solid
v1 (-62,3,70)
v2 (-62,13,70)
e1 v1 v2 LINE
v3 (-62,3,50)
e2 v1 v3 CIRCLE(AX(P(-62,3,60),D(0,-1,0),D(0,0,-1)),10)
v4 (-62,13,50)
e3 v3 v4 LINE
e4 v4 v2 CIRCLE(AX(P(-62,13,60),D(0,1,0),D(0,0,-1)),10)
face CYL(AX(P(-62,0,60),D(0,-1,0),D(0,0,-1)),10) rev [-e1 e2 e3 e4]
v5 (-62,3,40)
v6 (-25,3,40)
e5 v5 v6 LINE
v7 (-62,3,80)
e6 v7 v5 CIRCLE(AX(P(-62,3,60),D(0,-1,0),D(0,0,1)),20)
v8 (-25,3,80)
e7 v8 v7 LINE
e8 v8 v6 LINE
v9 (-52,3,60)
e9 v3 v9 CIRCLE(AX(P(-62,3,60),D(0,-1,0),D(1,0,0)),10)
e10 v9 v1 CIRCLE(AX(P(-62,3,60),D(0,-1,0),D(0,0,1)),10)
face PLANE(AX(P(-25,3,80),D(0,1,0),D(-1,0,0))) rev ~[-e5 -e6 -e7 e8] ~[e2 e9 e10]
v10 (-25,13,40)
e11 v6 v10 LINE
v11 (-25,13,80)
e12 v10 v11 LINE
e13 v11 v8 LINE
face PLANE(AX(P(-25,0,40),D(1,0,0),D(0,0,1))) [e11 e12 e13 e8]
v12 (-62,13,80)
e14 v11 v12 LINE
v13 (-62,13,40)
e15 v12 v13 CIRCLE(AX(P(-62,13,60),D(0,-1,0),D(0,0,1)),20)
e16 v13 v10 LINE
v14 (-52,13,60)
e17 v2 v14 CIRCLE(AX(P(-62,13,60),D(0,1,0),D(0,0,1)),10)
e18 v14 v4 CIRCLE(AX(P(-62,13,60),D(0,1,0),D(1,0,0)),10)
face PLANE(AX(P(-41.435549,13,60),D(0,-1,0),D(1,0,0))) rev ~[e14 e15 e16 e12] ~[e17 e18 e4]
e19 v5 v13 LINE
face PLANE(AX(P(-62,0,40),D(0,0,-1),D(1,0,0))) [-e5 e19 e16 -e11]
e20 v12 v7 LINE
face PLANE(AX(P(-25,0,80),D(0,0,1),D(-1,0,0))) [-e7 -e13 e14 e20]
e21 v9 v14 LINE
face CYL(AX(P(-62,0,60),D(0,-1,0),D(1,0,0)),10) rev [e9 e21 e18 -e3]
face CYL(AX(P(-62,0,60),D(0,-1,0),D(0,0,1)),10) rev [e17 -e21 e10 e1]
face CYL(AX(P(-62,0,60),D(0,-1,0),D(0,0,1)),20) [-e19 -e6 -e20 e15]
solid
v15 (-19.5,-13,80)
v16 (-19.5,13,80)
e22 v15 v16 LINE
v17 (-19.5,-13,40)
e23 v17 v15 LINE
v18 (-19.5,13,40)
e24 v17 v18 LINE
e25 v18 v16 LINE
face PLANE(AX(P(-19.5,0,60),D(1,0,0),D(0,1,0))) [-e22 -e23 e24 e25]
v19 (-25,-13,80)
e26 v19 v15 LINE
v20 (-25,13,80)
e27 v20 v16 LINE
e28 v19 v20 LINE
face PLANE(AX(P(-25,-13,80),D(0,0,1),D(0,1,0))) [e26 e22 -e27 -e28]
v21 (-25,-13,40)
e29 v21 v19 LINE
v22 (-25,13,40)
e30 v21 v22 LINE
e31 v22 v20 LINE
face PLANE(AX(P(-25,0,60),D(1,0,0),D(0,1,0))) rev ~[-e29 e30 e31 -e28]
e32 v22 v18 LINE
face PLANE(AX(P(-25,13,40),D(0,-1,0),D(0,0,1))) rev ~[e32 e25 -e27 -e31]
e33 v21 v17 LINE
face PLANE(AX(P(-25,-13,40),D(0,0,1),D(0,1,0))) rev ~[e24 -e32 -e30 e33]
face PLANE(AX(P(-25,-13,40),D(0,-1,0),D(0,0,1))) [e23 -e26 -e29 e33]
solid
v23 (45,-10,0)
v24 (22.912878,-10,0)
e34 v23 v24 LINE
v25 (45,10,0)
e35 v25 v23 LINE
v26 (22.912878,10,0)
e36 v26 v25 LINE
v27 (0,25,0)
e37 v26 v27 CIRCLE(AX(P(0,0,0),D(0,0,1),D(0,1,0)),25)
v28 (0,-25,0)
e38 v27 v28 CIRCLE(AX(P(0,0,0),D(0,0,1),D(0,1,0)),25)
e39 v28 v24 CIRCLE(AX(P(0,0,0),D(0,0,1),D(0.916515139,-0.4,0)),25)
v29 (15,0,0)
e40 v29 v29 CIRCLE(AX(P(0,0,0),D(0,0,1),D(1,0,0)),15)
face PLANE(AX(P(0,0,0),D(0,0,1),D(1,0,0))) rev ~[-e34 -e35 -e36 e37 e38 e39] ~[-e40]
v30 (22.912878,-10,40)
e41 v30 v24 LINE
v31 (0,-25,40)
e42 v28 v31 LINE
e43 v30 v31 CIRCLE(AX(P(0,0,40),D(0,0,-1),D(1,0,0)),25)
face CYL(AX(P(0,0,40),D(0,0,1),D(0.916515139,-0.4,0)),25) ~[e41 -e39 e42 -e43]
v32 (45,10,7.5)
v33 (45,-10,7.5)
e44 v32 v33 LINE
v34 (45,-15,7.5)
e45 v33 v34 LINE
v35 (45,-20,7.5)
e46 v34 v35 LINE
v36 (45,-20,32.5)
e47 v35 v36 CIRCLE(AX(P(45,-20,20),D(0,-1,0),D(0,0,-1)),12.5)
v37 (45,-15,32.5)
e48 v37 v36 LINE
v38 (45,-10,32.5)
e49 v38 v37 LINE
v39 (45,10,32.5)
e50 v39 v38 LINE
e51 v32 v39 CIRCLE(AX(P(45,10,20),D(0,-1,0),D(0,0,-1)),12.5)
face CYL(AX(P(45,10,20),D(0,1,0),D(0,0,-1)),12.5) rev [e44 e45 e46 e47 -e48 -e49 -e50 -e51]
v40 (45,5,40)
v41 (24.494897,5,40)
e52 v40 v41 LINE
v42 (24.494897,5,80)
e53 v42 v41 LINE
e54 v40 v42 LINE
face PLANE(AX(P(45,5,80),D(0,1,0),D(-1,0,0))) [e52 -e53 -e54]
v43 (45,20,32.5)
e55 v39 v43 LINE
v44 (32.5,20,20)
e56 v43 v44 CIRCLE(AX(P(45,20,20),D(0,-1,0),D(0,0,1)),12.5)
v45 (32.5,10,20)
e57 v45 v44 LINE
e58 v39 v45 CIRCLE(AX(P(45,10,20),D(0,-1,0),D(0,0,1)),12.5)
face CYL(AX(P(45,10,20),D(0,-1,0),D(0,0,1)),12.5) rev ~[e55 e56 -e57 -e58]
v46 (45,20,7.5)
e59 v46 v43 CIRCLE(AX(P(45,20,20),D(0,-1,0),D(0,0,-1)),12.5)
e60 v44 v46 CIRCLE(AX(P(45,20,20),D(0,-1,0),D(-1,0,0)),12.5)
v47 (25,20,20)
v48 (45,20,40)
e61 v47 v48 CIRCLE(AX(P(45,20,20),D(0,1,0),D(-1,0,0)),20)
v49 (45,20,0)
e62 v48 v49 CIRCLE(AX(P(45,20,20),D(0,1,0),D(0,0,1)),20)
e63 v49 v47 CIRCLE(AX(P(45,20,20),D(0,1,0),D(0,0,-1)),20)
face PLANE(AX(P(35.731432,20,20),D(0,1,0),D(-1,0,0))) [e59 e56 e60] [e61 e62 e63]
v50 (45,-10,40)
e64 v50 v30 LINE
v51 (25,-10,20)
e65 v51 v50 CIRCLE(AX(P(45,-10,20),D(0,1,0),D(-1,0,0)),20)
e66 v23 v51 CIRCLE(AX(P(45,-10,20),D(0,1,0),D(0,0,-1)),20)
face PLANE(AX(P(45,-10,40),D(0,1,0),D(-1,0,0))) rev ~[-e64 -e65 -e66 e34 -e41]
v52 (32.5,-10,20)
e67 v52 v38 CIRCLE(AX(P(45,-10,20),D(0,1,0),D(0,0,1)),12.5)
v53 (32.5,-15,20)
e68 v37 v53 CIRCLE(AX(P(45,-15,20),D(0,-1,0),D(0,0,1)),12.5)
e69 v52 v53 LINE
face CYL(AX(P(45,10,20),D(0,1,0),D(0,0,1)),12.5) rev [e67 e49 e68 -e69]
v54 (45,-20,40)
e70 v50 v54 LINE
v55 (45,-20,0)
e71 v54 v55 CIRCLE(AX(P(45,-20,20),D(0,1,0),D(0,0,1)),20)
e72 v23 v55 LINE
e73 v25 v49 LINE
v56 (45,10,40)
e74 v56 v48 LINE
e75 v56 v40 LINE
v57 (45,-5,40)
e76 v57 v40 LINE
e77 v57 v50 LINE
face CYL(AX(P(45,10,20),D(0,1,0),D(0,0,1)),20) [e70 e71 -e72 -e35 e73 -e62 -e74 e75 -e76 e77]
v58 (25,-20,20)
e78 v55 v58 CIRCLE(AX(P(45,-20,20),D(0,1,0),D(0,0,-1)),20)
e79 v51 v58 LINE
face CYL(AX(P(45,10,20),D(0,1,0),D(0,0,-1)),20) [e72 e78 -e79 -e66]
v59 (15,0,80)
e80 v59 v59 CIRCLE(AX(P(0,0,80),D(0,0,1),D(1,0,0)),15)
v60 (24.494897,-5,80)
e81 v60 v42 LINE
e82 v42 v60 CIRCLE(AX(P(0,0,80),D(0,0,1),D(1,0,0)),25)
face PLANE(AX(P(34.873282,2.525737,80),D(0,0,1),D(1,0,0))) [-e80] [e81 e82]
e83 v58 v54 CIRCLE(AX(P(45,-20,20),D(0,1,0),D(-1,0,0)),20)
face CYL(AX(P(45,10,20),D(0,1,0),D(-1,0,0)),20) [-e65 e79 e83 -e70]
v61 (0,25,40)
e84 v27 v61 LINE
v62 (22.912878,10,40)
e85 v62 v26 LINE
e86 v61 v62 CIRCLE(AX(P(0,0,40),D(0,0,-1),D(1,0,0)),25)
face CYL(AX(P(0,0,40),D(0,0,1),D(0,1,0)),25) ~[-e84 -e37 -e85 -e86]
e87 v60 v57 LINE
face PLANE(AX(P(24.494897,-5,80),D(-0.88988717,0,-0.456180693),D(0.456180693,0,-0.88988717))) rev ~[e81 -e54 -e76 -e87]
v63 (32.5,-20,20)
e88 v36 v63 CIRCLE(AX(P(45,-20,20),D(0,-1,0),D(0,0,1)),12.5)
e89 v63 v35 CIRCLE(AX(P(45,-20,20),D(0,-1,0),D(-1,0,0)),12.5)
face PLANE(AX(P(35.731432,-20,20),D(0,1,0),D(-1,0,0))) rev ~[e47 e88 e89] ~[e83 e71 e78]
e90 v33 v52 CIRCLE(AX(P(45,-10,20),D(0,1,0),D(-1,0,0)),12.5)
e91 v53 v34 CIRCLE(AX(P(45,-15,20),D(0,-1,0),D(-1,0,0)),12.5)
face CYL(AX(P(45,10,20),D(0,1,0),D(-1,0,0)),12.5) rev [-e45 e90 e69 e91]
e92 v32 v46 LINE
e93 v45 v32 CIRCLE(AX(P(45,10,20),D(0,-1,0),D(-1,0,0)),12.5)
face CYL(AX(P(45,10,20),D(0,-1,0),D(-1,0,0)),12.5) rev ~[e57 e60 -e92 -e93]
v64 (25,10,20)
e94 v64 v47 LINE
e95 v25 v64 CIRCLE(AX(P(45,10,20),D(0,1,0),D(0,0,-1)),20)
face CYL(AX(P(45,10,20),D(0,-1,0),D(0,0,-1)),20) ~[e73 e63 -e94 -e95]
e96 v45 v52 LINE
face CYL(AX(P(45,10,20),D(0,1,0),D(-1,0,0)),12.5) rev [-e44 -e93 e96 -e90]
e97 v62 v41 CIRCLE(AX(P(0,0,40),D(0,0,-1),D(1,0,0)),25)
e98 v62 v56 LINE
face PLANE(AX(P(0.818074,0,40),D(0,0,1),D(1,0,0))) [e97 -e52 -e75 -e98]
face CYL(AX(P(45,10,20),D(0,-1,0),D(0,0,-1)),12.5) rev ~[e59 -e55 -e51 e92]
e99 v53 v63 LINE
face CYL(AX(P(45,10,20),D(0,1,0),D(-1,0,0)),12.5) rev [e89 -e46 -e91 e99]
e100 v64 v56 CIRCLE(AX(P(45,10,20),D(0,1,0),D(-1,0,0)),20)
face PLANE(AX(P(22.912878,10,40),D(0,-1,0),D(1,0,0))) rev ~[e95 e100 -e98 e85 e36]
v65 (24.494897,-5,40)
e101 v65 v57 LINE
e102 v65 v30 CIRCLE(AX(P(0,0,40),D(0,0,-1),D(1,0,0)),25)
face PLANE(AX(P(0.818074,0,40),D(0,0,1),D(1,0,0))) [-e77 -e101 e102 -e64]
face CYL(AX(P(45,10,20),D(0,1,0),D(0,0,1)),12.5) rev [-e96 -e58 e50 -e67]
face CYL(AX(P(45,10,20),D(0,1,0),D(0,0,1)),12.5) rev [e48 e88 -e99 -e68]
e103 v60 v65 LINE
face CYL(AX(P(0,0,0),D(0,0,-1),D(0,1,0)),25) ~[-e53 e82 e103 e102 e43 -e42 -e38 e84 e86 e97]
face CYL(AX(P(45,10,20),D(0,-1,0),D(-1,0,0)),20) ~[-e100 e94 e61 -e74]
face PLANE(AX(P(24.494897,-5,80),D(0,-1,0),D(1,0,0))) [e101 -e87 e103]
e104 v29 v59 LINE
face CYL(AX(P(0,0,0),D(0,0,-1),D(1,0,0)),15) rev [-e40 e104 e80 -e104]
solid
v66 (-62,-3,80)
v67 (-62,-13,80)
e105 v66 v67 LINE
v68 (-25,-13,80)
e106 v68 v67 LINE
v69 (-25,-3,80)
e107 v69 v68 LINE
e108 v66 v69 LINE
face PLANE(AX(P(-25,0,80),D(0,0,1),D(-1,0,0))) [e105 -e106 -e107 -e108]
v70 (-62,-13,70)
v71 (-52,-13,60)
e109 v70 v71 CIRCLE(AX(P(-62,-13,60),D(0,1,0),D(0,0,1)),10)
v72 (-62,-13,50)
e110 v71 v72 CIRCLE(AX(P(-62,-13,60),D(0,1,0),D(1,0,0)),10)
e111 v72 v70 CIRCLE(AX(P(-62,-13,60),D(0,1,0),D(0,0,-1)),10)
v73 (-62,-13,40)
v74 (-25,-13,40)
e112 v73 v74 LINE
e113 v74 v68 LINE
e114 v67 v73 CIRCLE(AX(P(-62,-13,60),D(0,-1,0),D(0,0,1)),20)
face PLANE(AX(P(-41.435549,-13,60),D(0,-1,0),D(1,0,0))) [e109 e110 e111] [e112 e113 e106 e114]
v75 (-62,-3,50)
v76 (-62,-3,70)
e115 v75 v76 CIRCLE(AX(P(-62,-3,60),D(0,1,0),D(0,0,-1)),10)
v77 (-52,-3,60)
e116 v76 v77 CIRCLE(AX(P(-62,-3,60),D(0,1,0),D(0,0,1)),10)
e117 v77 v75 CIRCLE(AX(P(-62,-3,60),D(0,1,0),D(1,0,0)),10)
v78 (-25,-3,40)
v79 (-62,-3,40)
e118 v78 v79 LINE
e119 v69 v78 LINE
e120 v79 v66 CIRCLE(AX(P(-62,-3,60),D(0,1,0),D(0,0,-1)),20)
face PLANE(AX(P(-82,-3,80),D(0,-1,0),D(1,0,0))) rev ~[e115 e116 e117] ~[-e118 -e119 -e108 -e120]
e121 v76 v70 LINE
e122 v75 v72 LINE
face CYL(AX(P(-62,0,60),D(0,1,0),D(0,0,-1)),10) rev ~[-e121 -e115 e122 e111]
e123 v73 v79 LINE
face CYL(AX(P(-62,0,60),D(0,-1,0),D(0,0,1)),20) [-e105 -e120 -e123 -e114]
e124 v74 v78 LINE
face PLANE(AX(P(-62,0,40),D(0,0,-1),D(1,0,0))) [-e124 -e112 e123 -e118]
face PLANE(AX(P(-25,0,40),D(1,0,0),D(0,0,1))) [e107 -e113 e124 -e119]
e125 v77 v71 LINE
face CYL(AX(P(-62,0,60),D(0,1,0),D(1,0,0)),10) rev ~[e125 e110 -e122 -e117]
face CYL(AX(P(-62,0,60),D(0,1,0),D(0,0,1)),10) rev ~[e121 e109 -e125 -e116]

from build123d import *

# Parameters (mm, degrees)
F0_R           = 25
F0_R_2         = 15
F1_DEPTH       = 80
F4_DEPTH       = 40
F6_DEPTH       = 25
F7_R           = 15
F8_DEPTH       = 40
F10_DEPTH      = 49.5
F12_DEPTH      = 10
F12_DEPTH_BACK = 30
F13_DEPTH      = 25
F17_DEPTH      = 13
F17_DEPTH_BACK = 13
F18_W          = 26
F18_H          = 40
F19_DEPTH      = 5.5
F20_W          = 37
F20_H          = 3
F21_DEPTH      = 156.4


with BuildPart() as f1:
    # F0 (on Top) → F1 (new body)
    with BuildSketch(Plane.XY):
        Circle(F0_R)
        Circle(F0_R_2, mode=Mode.SUBTRACT)
    extrude(amount=F1_DEPTH)

    # F3 (on face) → F4 (join)
    with BuildSketch(Plane.XY.offset(80)):
        with BuildLine():
            ThreePointArc((24.4948974278, 5), (24.8734038251, 2.5127240501), (25, 0))
            Line((25, 0), (45, 0))
            Line((45, 0), (45, 5))
            Line((45, 5), (24.4948974278, 5))
        make_face()
        with BuildLine():
            Line((45, 0), (25, 0))
            ThreePointArc((25, 0), (24.8734038251, -2.5127240501), (24.4948974278, -5))
            Line((24.4948974278, -5), (45, -5))
            Line((45, -5), (45, 0))
        make_face()
    extrude(amount=-F4_DEPTH)

    # F5 (on face) → F6 (cut)
    with BuildSketch(Plane.XZ.offset(5)):
        Polygon((45, 80), (24.4948974278, 80), (45, 40), align=None)
    extrude(amount=-F6_DEPTH, mode=Mode.SUBTRACT)

    # F7 (on Top) → F8 (join)
    with BuildSketch(Plane.XY):
        with BuildLine():
            ThreePointArc((0, -25), (17.6776695297, -17.6776695297), (25, 0))
            ThreePointArc((25, 0), (17.6776695297, 17.6776695297), (0, 25))
            ThreePointArc((0, 25), (-25, 0), (0, -25))
        make_face()
        Circle(F7_R, mode=Mode.SUBTRACT)
        with BuildLine():
            ThreePointArc((0, 25), (17.6776695297, 17.6776695297), (25, 0))
            ThreePointArc((25, 0), (17.6776695297, -17.6776695297), (0, -25))
            Line((0, -25), (57, -25))
            Line((57, -25), (57, 25))
            Line((57, 25), (0, 25))
        make_face()
    extrude(amount=F8_DEPTH)

    # F9 (on face) → F10 (cut)
    with BuildSketch(Plane.XY.offset(40)):
        with BuildLine():
            Line((45, 5), (45, 0))
            Line((45, 0), (45, -5))
            Line((45, -5), (45, -10))
            Line((45, -10), (22.9128784748, -10))
            ThreePointArc((22.9128784748, -10), (13.6930639376, -20.9165006634), (0, -25))
            Line((0, -25), (57, -25))
            Line((57, -25), (57, 25))
            Line((57, 25), (0, 25))
            ThreePointArc((0, 25), (13.6930639376, 20.9165006634), (22.9128784748, 10))
            Line((22.9128784748, 10), (24.4948974278, 10))
            Line((24.4948974278, 10), (45, 10))
            Line((45, 10), (45, 5))
        make_face()
    extrude(amount=-F10_DEPTH, mode=Mode.SUBTRACT)

    # F11 (on face) → F12 (join, two sides)
    with BuildSketch(Plane(origin=(0, 10, 0), x_dir=(-1, 0, 0), z_dir=(0, 1, 0))) as f12_sk:
        with BuildLine():
            ThreePointArc((-45, 0), (-30.8578643763, 5.8578643763), (-25, 20))
            ThreePointArc((-25, 20), (-30.8578643763, 34.1421356237), (-45, 40))
            Line((-45, 40), (-45, 32.5))
            ThreePointArc((-45, 32.5), (-36.1611652352, 28.8388347648), (-32.5, 20))
            ThreePointArc((-32.5, 20), (-36.1611652352, 11.1611652352), (-45, 7.5))
            Line((-45, 7.5), (-45, 0))
        make_face()
        with BuildLine():
            Line((-45, 32.5), (-45, 40))
            ThreePointArc((-45, 40), (-65, 20), (-45, 0))
            Line((-45, 0), (-45, 7.5))
            ThreePointArc((-45, 7.5), (-57.5, 20), (-45, 32.5))
        make_face()
    extrude(amount=F12_DEPTH)
    extrude(f12_sk.sketch, amount=-F12_DEPTH_BACK)

    # F13 (cut): a face of the model
    f13_faces = [f1.faces().sort_by_distance(p)[0] for p in [
        (39.6948352303, 10, 20),
    ]]
    extrude(f13_faces, amount=-F13_DEPTH, mode=Mode.SUBTRACT)


with BuildPart() as f17:
    # F16 (on Front) → F17 (new body, two sides)
    with BuildSketch(Plane.XZ) as f17_sk:
        with BuildLine():
            Line((-25, 40), (-25, 80))
            Line((-25, 80), (-62, 80))
            ThreePointArc((-62, 80), (-47.8578643763, 74.1421356237), (-42, 60))
            ThreePointArc((-42, 60), (-47.8578643763, 45.8578643763), (-62, 40))
            Line((-62, 40), (-25, 40))
        make_face()
        with BuildLine():
            ThreePointArc((-42, 60), (-47.8578643763, 74.1421356237), (-62, 80))
            Line((-62, 80), (-62, 70))
            ThreePointArc((-62, 70), (-54.9289321881, 67.0710678119), (-52, 60))
            ThreePointArc((-52, 60), (-54.9289321881, 52.9289321881), (-62, 50))
            Line((-62, 50), (-62, 40))
            ThreePointArc((-62, 40), (-47.8578643763, 45.8578643763), (-42, 60))
        make_face()
        with BuildLine():
            Line((-62, 70), (-62, 80))
            ThreePointArc((-62, 80), (-82, 60), (-62, 40))
            Line((-62, 40), (-62, 50))
            ThreePointArc((-62, 50), (-72, 60), (-62, 70))
        make_face()
    extrude(amount=F17_DEPTH)
    extrude(f17_sk.sketch, amount=-F17_DEPTH_BACK)

    # F20 (on face) → F21 (cut)
    with BuildSketch(Plane.XY.offset(80)):
        with Locations((-43.5, 1.5)):
            Rectangle(F20_W, F20_H)
        with Locations((-43.5, -1.5)):
            Rectangle(F20_W, F20_H)
        Polygon((-62, -3), (-62, 0), (-62, 3), (-82, 3), (-82, -3), align=None)
    extrude(amount=-F21_DEPTH, mode=Mode.SUBTRACT)


with BuildPart() as f19:
    # F18 (on face) → F19 (new body)
    with BuildSketch(Plane.YZ.offset(-25)):
        with Locations((0, 60)):
            Rectangle(F18_W, F18_H)
    extrude(amount=F19_DEPTH)


solid = Compound([f1.part, f17.part, f19.part])
